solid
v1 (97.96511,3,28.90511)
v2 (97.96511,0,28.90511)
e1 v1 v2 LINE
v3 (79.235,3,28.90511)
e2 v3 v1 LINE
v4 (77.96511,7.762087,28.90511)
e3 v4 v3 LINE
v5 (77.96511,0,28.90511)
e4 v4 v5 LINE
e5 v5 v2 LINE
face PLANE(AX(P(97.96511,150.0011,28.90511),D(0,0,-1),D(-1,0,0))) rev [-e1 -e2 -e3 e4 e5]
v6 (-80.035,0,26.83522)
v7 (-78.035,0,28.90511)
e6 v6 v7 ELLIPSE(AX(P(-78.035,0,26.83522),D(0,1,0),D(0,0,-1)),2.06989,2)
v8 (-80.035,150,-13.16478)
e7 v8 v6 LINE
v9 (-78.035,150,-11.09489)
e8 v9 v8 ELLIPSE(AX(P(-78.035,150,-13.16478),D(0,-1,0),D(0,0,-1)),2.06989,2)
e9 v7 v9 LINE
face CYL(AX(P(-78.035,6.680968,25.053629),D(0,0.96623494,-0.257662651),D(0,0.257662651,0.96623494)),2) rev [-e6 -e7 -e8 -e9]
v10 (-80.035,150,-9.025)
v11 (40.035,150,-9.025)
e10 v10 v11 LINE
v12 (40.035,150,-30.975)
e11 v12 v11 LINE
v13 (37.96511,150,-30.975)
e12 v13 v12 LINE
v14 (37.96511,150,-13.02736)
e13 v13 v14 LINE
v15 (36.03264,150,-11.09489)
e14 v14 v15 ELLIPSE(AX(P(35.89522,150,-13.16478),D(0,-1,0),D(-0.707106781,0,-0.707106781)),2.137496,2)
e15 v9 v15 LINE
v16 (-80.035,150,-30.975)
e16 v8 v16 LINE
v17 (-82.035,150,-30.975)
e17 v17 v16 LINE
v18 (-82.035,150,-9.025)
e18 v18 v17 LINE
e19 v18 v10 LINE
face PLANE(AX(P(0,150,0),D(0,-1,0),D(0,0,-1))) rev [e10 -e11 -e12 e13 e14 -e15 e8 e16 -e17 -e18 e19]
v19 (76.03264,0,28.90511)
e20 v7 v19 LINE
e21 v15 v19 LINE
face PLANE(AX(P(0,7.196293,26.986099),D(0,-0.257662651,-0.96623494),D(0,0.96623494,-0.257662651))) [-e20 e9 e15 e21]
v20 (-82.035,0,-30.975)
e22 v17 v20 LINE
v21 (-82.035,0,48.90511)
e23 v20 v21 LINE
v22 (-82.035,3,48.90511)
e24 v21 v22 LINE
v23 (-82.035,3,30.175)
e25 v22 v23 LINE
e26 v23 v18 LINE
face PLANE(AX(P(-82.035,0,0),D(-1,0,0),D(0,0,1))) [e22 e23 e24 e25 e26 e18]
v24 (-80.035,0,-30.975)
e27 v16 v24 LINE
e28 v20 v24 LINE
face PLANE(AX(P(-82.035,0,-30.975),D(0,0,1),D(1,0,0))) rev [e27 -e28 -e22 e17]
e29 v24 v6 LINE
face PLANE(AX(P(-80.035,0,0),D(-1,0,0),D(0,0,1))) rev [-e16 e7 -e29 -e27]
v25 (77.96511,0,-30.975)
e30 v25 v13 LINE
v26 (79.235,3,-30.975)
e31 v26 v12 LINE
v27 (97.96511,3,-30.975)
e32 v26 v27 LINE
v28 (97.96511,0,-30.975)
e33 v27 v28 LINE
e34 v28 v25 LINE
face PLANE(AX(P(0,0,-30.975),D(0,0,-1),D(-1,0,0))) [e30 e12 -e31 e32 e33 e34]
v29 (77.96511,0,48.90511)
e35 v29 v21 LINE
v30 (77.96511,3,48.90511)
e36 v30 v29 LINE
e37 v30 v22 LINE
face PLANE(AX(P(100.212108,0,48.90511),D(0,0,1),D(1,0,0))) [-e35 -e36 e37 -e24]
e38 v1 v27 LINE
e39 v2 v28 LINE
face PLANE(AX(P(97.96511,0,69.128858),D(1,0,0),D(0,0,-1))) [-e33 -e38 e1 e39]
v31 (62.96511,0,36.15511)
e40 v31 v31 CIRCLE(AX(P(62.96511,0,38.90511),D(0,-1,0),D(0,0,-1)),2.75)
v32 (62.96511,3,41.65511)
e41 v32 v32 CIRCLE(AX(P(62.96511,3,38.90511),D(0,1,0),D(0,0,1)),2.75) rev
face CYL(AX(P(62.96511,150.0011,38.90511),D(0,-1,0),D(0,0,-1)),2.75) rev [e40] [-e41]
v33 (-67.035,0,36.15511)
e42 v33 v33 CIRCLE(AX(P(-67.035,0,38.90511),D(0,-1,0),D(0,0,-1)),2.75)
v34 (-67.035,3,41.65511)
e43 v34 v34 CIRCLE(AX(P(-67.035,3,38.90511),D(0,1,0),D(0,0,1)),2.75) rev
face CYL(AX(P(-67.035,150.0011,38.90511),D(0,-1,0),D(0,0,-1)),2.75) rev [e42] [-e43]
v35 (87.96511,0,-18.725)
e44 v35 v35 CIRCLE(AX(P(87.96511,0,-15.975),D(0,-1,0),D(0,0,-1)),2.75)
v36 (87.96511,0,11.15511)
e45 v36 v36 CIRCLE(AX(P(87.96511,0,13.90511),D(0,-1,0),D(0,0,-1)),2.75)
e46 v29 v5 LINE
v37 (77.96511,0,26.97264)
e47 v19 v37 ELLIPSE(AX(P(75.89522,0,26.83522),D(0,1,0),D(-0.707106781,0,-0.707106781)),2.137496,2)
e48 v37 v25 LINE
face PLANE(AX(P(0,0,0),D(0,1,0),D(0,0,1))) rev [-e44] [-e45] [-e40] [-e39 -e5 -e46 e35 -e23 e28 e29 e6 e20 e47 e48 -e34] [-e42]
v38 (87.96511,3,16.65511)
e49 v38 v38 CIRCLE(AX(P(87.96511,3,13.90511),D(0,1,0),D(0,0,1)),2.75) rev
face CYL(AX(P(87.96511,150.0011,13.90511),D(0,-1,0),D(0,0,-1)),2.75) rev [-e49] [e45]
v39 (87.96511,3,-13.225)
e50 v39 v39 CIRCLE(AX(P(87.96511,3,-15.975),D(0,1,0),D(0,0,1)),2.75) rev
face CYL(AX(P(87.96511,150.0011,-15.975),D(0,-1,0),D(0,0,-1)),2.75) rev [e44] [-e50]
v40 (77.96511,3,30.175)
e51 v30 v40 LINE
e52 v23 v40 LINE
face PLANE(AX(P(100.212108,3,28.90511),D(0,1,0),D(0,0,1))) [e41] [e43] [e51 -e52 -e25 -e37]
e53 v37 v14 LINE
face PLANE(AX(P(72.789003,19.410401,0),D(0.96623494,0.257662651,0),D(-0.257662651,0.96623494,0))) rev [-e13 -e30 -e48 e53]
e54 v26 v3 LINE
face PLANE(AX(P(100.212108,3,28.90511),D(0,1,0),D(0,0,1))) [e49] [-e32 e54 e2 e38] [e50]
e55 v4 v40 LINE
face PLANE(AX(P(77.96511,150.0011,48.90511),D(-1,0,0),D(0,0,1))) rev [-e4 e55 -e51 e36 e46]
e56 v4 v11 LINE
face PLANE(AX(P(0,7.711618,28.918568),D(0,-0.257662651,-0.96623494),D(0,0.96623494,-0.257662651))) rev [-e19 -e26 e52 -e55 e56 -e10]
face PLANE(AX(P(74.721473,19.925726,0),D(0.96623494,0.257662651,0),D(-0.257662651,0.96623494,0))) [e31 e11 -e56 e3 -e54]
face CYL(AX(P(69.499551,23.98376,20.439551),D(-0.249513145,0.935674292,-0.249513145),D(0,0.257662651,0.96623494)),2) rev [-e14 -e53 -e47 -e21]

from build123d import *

# Parameters (mm, degrees)
SHELL1_START        = -169
SHELL1_DEPTH        = 196.698454184
BOSS_EXTRUDE1_REACH = 223.544
SKETCH5_W           = 20
SKETCH5_H           = 3
SKETCH6_W           = 20
SKETCH6_H           = 3
BOSS_EXTRUDE2_DEPTH = 79.88011004
CUT_EXTRUDE1_REACH  = 187.712
SKETCH7_W           = 20
SKETCH7_H           = 20
BOSS_EXTRUDE3_DEPTH = 2
FILLET1_R           = 2
CUT_EXTRUDE2_REACH  = 187.712
SKETCH9_R           = 2.75


with BuildPart() as part:
    # Loft1: read off the stored shape, not the designer's step
    # Loft1: loft between two sections, ruled curve by curve
    loft1_from = [
        Edge.make_line((40.035, 150, -9.025), (-80.035, 150, -9.025)),
        Edge.make_line((-80.035, 150, -9.025), (-80.035, 150, -30.975)),
        Edge.make_line((40.035, 150, -30.975), (40.035, 150, -9.025)),
        Edge.make_line((-80.035, 150, -30.975), (40.035, 150, -30.975)),
    ]
    loft1_to = [
        Edge.make_line((80.035, 0, 30.975), (-80.035, 0, 30.975)),
        Edge.make_line((-80.035, 0, 30.975), (-80.035, 0, -30.975)),
        Edge.make_line((80.035, 0, -30.975), (80.035, 0, 30.975)),
        Edge.make_line((-80.035, 0, -30.975), (80.035, 0, -30.975)),
    ]
    loft1 = Solid(Shell([*[Face.make_surface_from_curves(loft1_from[k], loft1_to[k]) for k in range(4)], Face(Wire(loft1_from)), Face(Wire(loft1_to))]))
    add(loft1)

    # Shell1: read off the stored shape, not the designer's step
    # Shell1 outline → Shell1 (cut)
    with BuildSketch(Plane(origin=(0, 0, 0), x_dir=(0.9683714115263207, 0.24108831822232024, -0.06429021819261868), z_dir=(0.2495131446207219, -0.935674292327708, 0.2495131446207219)).offset(SHELL1_START)):
        Polygon((73.640867828, 27.929127254), (-81, 27.929127254), (-81, -31), (77.561825655, -31), (77.490573168, -29.929127254), align=None)
    extrude(amount=SHELL1_DEPTH, mode=Mode.SUBTRACT)

    # Boss-Extrude1: up to this plane
    boss_extrude1_end = Plane(origin=(74.721473029, 19.925726141, 0), z_dir=(0.9662349396012464, 0.2576626505603324, 0))
    # Sketch5 → Boss-Extrude1 (add, up to the surface)
    with BuildSketch(Plane.ZY.offset(80.035), mode=Mode.PRIVATE) as boss_extrude1_sk1:
        with Locations((38.90511004, 1.5)):
            Rectangle(SKETCH5_W, SKETCH5_H)
    boss_extrude1_tool1 = split(extrude(boss_extrude1_sk1.sketch, amount=-BOSS_EXTRUDE1_REACH, mode=Mode.PRIVATE), bisect_by=boss_extrude1_end, keep=Keep.BOTH, mode=Mode.PRIVATE)
    add(boss_extrude1_tool1.solids().sort_by_distance((-80.035, 1.5, 38.90511))[0])

    # Sketch6 → Boss-Extrude2 (add)
    with BuildSketch(Plane(origin=(0, 0, -30.975), x_dir=(-1, 0, 0), z_dir=(0, 0, -1))):
        with Locations((-87.96511004, 1.5)):
            Rectangle(SKETCH6_W, SKETCH6_H)
    extrude(amount=-BOSS_EXTRUDE2_DEPTH)

    # Sketch7 → Cut-Extrude1 (cut, up to next)
    with BuildSketch(Plane(origin=(0, 0, 0), x_dir=(-1, 0, 0), z_dir=(0, -1, 0)), mode=Mode.PRIVATE) as cut_extrude1_sk1:
        with Locations((-87.96511004, -38.90511004)):
            Rectangle(SKETCH7_W, SKETCH7_H)
    cut_extrude1_tool1 = extrude(cut_extrude1_sk1.sketch, amount=-CUT_EXTRUDE1_REACH, mode=Mode.PRIVATE) & part.part
    add(cut_extrude1_tool1.solids().sort_by_distance((87.96511, 0, 38.90511))[0], mode=Mode.SUBTRACT)

    # Sketch8 → Boss-Extrude3 (add)
    with BuildSketch(Plane.ZY.offset(80.035)):
        Polygon((28.90511004, 0), (-30.975, 0), (-30.975, 150), (-11.09488996, 150), (-9.025, 150), (30.175, 3), (48.90511004, 3), (48.90511004, 0), align=None)
    extrude(amount=BOSS_EXTRUDE3_DEPTH)

    # Fillet1
    # the kernel refuses this fillet: 2 mm, written as the material it adds along each edge
    with BuildSketch(Plane(origin=(36.797794865, 154.377431907, -12.262205135), x_dir=(0.06429021819457766, -0.24108831822179794, -0.9683714115263207), z_dir=(0.24951314462072197, -0.9356742923277082, 0.24951314462072197))) as fillet1_piece_1_section:
        with BuildLine():
            CenterArc((FILLET1_R * 0.935674292326, -FILLET1_R), FILLET1_R, 90, 86.193330917)
            Line((-FILLET1_R * 0.0621194550941, -FILLET1_R * 0.933609958504), (0, 0))
            Line((0, 0), (FILLET1_R * 0.935674292326, 0))
        make_face()
    fillet1_piece_1 = extrude(amount=172.943798365, mode=Mode.PRIVATE)
    fillet1_piece_1 = split(fillet1_piece_1, bisect_by=Plane(origin=(36.797794865, 150, -12.262205135), z_dir=(0, -1, 0)), keep=Keep.TOP, mode=Mode.PRIVATE)
    fillet1_piece_1 = split(fillet1_piece_1, bisect_by=Plane(origin=(36.797794865, 0, -12.262205135), z_dir=(0, 1, 0)), keep=Keep.TOP, mode=Mode.PRIVATE)
    add(fillet1_piece_1)
    with BuildSketch(Plane(origin=(-80.035, 154.831174698, -12.383203212), x_dir=(1, 0, 0), z_dir=(0, -0.9662349396012464, 0.2576626505603321))) as fillet1_piece_2_section:
        with BuildLine():
            CenterArc((FILLET1_R, -FILLET1_R), FILLET1_R, 90, 90)
            Line((0, -FILLET1_R), (0, 0))
            Line((0, 0), (FILLET1_R, 0))
        make_face()
    fillet1_piece_2 = extrude(amount=165.241746963, mode=Mode.PRIVATE)
    fillet1_piece_2 = split(fillet1_piece_2, bisect_by=Plane(origin=(-80.035, 150, -12.383203212), z_dir=(0, -1, 0)), keep=Keep.TOP, mode=Mode.PRIVATE)
    fillet1_piece_2 = split(fillet1_piece_2, bisect_by=Plane(origin=(-80.035, 0, -12.383203212), z_dir=(0, 1, 0)), keep=Keep.TOP, mode=Mode.PRIVATE)
    add(fillet1_piece_2)

    # Sketch9 → Cut-Extrude2 (cut, up to next)
    with BuildSketch(Plane.XZ, mode=Mode.PRIVATE) as cut_extrude2_sk1:
        with Locations(Location((87.96511004, -15.975, 0), (0, 0, 270))):
            Circle(SKETCH9_R)
    cut_extrude2_tool1 = extrude(cut_extrude2_sk1.sketch, amount=-CUT_EXTRUDE2_REACH, mode=Mode.PRIVATE) & part.part
    # Sketch9 → Cut-Extrude2 (cut, up to next)
    with BuildSketch(Plane.XZ, mode=Mode.PRIVATE) as cut_extrude2_sk2:
        with Locations(Location((87.96511004, 13.90511004, 0), (0, 0, 270))):
            Circle(SKETCH9_R)
    cut_extrude2_tool2 = extrude(cut_extrude2_sk2.sketch, amount=-CUT_EXTRUDE2_REACH, mode=Mode.PRIVATE) & part.part
    # Sketch9 → Cut-Extrude2 (cut, up to next)
    with BuildSketch(Plane.XZ, mode=Mode.PRIVATE) as cut_extrude2_sk3:
        with Locations(Location((62.96511004, 38.90511004, 0), (0, 0, 270))):
            Circle(SKETCH9_R)
    cut_extrude2_tool3 = extrude(cut_extrude2_sk3.sketch, amount=-CUT_EXTRUDE2_REACH, mode=Mode.PRIVATE) & part.part
    # Sketch9 → Cut-Extrude2 (cut, up to next)
    with BuildSketch(Plane.XZ, mode=Mode.PRIVATE) as cut_extrude2_sk4:
        with Locations(Location((-67.035, 38.90511004, 0), (0, 0, 270))):
            Circle(SKETCH9_R)
    cut_extrude2_tool4 = extrude(cut_extrude2_sk4.sketch, amount=-CUT_EXTRUDE2_REACH, mode=Mode.PRIVATE) & part.part
    add(cut_extrude2_tool1.solids().sort_by_distance((87.96511, 0, -15.975))[0], mode=Mode.SUBTRACT)
    add(cut_extrude2_tool2.solids().sort_by_distance((87.96511, 0, 13.90511))[0], mode=Mode.SUBTRACT)
    add(cut_extrude2_tool3.solids().sort_by_distance((62.96511, 0, 38.90511))[0], mode=Mode.SUBTRACT)
    add(cut_extrude2_tool4.solids().sort_by_distance((-67.035, 0, 38.90511))[0], mode=Mode.SUBTRACT)


solid = part.part
